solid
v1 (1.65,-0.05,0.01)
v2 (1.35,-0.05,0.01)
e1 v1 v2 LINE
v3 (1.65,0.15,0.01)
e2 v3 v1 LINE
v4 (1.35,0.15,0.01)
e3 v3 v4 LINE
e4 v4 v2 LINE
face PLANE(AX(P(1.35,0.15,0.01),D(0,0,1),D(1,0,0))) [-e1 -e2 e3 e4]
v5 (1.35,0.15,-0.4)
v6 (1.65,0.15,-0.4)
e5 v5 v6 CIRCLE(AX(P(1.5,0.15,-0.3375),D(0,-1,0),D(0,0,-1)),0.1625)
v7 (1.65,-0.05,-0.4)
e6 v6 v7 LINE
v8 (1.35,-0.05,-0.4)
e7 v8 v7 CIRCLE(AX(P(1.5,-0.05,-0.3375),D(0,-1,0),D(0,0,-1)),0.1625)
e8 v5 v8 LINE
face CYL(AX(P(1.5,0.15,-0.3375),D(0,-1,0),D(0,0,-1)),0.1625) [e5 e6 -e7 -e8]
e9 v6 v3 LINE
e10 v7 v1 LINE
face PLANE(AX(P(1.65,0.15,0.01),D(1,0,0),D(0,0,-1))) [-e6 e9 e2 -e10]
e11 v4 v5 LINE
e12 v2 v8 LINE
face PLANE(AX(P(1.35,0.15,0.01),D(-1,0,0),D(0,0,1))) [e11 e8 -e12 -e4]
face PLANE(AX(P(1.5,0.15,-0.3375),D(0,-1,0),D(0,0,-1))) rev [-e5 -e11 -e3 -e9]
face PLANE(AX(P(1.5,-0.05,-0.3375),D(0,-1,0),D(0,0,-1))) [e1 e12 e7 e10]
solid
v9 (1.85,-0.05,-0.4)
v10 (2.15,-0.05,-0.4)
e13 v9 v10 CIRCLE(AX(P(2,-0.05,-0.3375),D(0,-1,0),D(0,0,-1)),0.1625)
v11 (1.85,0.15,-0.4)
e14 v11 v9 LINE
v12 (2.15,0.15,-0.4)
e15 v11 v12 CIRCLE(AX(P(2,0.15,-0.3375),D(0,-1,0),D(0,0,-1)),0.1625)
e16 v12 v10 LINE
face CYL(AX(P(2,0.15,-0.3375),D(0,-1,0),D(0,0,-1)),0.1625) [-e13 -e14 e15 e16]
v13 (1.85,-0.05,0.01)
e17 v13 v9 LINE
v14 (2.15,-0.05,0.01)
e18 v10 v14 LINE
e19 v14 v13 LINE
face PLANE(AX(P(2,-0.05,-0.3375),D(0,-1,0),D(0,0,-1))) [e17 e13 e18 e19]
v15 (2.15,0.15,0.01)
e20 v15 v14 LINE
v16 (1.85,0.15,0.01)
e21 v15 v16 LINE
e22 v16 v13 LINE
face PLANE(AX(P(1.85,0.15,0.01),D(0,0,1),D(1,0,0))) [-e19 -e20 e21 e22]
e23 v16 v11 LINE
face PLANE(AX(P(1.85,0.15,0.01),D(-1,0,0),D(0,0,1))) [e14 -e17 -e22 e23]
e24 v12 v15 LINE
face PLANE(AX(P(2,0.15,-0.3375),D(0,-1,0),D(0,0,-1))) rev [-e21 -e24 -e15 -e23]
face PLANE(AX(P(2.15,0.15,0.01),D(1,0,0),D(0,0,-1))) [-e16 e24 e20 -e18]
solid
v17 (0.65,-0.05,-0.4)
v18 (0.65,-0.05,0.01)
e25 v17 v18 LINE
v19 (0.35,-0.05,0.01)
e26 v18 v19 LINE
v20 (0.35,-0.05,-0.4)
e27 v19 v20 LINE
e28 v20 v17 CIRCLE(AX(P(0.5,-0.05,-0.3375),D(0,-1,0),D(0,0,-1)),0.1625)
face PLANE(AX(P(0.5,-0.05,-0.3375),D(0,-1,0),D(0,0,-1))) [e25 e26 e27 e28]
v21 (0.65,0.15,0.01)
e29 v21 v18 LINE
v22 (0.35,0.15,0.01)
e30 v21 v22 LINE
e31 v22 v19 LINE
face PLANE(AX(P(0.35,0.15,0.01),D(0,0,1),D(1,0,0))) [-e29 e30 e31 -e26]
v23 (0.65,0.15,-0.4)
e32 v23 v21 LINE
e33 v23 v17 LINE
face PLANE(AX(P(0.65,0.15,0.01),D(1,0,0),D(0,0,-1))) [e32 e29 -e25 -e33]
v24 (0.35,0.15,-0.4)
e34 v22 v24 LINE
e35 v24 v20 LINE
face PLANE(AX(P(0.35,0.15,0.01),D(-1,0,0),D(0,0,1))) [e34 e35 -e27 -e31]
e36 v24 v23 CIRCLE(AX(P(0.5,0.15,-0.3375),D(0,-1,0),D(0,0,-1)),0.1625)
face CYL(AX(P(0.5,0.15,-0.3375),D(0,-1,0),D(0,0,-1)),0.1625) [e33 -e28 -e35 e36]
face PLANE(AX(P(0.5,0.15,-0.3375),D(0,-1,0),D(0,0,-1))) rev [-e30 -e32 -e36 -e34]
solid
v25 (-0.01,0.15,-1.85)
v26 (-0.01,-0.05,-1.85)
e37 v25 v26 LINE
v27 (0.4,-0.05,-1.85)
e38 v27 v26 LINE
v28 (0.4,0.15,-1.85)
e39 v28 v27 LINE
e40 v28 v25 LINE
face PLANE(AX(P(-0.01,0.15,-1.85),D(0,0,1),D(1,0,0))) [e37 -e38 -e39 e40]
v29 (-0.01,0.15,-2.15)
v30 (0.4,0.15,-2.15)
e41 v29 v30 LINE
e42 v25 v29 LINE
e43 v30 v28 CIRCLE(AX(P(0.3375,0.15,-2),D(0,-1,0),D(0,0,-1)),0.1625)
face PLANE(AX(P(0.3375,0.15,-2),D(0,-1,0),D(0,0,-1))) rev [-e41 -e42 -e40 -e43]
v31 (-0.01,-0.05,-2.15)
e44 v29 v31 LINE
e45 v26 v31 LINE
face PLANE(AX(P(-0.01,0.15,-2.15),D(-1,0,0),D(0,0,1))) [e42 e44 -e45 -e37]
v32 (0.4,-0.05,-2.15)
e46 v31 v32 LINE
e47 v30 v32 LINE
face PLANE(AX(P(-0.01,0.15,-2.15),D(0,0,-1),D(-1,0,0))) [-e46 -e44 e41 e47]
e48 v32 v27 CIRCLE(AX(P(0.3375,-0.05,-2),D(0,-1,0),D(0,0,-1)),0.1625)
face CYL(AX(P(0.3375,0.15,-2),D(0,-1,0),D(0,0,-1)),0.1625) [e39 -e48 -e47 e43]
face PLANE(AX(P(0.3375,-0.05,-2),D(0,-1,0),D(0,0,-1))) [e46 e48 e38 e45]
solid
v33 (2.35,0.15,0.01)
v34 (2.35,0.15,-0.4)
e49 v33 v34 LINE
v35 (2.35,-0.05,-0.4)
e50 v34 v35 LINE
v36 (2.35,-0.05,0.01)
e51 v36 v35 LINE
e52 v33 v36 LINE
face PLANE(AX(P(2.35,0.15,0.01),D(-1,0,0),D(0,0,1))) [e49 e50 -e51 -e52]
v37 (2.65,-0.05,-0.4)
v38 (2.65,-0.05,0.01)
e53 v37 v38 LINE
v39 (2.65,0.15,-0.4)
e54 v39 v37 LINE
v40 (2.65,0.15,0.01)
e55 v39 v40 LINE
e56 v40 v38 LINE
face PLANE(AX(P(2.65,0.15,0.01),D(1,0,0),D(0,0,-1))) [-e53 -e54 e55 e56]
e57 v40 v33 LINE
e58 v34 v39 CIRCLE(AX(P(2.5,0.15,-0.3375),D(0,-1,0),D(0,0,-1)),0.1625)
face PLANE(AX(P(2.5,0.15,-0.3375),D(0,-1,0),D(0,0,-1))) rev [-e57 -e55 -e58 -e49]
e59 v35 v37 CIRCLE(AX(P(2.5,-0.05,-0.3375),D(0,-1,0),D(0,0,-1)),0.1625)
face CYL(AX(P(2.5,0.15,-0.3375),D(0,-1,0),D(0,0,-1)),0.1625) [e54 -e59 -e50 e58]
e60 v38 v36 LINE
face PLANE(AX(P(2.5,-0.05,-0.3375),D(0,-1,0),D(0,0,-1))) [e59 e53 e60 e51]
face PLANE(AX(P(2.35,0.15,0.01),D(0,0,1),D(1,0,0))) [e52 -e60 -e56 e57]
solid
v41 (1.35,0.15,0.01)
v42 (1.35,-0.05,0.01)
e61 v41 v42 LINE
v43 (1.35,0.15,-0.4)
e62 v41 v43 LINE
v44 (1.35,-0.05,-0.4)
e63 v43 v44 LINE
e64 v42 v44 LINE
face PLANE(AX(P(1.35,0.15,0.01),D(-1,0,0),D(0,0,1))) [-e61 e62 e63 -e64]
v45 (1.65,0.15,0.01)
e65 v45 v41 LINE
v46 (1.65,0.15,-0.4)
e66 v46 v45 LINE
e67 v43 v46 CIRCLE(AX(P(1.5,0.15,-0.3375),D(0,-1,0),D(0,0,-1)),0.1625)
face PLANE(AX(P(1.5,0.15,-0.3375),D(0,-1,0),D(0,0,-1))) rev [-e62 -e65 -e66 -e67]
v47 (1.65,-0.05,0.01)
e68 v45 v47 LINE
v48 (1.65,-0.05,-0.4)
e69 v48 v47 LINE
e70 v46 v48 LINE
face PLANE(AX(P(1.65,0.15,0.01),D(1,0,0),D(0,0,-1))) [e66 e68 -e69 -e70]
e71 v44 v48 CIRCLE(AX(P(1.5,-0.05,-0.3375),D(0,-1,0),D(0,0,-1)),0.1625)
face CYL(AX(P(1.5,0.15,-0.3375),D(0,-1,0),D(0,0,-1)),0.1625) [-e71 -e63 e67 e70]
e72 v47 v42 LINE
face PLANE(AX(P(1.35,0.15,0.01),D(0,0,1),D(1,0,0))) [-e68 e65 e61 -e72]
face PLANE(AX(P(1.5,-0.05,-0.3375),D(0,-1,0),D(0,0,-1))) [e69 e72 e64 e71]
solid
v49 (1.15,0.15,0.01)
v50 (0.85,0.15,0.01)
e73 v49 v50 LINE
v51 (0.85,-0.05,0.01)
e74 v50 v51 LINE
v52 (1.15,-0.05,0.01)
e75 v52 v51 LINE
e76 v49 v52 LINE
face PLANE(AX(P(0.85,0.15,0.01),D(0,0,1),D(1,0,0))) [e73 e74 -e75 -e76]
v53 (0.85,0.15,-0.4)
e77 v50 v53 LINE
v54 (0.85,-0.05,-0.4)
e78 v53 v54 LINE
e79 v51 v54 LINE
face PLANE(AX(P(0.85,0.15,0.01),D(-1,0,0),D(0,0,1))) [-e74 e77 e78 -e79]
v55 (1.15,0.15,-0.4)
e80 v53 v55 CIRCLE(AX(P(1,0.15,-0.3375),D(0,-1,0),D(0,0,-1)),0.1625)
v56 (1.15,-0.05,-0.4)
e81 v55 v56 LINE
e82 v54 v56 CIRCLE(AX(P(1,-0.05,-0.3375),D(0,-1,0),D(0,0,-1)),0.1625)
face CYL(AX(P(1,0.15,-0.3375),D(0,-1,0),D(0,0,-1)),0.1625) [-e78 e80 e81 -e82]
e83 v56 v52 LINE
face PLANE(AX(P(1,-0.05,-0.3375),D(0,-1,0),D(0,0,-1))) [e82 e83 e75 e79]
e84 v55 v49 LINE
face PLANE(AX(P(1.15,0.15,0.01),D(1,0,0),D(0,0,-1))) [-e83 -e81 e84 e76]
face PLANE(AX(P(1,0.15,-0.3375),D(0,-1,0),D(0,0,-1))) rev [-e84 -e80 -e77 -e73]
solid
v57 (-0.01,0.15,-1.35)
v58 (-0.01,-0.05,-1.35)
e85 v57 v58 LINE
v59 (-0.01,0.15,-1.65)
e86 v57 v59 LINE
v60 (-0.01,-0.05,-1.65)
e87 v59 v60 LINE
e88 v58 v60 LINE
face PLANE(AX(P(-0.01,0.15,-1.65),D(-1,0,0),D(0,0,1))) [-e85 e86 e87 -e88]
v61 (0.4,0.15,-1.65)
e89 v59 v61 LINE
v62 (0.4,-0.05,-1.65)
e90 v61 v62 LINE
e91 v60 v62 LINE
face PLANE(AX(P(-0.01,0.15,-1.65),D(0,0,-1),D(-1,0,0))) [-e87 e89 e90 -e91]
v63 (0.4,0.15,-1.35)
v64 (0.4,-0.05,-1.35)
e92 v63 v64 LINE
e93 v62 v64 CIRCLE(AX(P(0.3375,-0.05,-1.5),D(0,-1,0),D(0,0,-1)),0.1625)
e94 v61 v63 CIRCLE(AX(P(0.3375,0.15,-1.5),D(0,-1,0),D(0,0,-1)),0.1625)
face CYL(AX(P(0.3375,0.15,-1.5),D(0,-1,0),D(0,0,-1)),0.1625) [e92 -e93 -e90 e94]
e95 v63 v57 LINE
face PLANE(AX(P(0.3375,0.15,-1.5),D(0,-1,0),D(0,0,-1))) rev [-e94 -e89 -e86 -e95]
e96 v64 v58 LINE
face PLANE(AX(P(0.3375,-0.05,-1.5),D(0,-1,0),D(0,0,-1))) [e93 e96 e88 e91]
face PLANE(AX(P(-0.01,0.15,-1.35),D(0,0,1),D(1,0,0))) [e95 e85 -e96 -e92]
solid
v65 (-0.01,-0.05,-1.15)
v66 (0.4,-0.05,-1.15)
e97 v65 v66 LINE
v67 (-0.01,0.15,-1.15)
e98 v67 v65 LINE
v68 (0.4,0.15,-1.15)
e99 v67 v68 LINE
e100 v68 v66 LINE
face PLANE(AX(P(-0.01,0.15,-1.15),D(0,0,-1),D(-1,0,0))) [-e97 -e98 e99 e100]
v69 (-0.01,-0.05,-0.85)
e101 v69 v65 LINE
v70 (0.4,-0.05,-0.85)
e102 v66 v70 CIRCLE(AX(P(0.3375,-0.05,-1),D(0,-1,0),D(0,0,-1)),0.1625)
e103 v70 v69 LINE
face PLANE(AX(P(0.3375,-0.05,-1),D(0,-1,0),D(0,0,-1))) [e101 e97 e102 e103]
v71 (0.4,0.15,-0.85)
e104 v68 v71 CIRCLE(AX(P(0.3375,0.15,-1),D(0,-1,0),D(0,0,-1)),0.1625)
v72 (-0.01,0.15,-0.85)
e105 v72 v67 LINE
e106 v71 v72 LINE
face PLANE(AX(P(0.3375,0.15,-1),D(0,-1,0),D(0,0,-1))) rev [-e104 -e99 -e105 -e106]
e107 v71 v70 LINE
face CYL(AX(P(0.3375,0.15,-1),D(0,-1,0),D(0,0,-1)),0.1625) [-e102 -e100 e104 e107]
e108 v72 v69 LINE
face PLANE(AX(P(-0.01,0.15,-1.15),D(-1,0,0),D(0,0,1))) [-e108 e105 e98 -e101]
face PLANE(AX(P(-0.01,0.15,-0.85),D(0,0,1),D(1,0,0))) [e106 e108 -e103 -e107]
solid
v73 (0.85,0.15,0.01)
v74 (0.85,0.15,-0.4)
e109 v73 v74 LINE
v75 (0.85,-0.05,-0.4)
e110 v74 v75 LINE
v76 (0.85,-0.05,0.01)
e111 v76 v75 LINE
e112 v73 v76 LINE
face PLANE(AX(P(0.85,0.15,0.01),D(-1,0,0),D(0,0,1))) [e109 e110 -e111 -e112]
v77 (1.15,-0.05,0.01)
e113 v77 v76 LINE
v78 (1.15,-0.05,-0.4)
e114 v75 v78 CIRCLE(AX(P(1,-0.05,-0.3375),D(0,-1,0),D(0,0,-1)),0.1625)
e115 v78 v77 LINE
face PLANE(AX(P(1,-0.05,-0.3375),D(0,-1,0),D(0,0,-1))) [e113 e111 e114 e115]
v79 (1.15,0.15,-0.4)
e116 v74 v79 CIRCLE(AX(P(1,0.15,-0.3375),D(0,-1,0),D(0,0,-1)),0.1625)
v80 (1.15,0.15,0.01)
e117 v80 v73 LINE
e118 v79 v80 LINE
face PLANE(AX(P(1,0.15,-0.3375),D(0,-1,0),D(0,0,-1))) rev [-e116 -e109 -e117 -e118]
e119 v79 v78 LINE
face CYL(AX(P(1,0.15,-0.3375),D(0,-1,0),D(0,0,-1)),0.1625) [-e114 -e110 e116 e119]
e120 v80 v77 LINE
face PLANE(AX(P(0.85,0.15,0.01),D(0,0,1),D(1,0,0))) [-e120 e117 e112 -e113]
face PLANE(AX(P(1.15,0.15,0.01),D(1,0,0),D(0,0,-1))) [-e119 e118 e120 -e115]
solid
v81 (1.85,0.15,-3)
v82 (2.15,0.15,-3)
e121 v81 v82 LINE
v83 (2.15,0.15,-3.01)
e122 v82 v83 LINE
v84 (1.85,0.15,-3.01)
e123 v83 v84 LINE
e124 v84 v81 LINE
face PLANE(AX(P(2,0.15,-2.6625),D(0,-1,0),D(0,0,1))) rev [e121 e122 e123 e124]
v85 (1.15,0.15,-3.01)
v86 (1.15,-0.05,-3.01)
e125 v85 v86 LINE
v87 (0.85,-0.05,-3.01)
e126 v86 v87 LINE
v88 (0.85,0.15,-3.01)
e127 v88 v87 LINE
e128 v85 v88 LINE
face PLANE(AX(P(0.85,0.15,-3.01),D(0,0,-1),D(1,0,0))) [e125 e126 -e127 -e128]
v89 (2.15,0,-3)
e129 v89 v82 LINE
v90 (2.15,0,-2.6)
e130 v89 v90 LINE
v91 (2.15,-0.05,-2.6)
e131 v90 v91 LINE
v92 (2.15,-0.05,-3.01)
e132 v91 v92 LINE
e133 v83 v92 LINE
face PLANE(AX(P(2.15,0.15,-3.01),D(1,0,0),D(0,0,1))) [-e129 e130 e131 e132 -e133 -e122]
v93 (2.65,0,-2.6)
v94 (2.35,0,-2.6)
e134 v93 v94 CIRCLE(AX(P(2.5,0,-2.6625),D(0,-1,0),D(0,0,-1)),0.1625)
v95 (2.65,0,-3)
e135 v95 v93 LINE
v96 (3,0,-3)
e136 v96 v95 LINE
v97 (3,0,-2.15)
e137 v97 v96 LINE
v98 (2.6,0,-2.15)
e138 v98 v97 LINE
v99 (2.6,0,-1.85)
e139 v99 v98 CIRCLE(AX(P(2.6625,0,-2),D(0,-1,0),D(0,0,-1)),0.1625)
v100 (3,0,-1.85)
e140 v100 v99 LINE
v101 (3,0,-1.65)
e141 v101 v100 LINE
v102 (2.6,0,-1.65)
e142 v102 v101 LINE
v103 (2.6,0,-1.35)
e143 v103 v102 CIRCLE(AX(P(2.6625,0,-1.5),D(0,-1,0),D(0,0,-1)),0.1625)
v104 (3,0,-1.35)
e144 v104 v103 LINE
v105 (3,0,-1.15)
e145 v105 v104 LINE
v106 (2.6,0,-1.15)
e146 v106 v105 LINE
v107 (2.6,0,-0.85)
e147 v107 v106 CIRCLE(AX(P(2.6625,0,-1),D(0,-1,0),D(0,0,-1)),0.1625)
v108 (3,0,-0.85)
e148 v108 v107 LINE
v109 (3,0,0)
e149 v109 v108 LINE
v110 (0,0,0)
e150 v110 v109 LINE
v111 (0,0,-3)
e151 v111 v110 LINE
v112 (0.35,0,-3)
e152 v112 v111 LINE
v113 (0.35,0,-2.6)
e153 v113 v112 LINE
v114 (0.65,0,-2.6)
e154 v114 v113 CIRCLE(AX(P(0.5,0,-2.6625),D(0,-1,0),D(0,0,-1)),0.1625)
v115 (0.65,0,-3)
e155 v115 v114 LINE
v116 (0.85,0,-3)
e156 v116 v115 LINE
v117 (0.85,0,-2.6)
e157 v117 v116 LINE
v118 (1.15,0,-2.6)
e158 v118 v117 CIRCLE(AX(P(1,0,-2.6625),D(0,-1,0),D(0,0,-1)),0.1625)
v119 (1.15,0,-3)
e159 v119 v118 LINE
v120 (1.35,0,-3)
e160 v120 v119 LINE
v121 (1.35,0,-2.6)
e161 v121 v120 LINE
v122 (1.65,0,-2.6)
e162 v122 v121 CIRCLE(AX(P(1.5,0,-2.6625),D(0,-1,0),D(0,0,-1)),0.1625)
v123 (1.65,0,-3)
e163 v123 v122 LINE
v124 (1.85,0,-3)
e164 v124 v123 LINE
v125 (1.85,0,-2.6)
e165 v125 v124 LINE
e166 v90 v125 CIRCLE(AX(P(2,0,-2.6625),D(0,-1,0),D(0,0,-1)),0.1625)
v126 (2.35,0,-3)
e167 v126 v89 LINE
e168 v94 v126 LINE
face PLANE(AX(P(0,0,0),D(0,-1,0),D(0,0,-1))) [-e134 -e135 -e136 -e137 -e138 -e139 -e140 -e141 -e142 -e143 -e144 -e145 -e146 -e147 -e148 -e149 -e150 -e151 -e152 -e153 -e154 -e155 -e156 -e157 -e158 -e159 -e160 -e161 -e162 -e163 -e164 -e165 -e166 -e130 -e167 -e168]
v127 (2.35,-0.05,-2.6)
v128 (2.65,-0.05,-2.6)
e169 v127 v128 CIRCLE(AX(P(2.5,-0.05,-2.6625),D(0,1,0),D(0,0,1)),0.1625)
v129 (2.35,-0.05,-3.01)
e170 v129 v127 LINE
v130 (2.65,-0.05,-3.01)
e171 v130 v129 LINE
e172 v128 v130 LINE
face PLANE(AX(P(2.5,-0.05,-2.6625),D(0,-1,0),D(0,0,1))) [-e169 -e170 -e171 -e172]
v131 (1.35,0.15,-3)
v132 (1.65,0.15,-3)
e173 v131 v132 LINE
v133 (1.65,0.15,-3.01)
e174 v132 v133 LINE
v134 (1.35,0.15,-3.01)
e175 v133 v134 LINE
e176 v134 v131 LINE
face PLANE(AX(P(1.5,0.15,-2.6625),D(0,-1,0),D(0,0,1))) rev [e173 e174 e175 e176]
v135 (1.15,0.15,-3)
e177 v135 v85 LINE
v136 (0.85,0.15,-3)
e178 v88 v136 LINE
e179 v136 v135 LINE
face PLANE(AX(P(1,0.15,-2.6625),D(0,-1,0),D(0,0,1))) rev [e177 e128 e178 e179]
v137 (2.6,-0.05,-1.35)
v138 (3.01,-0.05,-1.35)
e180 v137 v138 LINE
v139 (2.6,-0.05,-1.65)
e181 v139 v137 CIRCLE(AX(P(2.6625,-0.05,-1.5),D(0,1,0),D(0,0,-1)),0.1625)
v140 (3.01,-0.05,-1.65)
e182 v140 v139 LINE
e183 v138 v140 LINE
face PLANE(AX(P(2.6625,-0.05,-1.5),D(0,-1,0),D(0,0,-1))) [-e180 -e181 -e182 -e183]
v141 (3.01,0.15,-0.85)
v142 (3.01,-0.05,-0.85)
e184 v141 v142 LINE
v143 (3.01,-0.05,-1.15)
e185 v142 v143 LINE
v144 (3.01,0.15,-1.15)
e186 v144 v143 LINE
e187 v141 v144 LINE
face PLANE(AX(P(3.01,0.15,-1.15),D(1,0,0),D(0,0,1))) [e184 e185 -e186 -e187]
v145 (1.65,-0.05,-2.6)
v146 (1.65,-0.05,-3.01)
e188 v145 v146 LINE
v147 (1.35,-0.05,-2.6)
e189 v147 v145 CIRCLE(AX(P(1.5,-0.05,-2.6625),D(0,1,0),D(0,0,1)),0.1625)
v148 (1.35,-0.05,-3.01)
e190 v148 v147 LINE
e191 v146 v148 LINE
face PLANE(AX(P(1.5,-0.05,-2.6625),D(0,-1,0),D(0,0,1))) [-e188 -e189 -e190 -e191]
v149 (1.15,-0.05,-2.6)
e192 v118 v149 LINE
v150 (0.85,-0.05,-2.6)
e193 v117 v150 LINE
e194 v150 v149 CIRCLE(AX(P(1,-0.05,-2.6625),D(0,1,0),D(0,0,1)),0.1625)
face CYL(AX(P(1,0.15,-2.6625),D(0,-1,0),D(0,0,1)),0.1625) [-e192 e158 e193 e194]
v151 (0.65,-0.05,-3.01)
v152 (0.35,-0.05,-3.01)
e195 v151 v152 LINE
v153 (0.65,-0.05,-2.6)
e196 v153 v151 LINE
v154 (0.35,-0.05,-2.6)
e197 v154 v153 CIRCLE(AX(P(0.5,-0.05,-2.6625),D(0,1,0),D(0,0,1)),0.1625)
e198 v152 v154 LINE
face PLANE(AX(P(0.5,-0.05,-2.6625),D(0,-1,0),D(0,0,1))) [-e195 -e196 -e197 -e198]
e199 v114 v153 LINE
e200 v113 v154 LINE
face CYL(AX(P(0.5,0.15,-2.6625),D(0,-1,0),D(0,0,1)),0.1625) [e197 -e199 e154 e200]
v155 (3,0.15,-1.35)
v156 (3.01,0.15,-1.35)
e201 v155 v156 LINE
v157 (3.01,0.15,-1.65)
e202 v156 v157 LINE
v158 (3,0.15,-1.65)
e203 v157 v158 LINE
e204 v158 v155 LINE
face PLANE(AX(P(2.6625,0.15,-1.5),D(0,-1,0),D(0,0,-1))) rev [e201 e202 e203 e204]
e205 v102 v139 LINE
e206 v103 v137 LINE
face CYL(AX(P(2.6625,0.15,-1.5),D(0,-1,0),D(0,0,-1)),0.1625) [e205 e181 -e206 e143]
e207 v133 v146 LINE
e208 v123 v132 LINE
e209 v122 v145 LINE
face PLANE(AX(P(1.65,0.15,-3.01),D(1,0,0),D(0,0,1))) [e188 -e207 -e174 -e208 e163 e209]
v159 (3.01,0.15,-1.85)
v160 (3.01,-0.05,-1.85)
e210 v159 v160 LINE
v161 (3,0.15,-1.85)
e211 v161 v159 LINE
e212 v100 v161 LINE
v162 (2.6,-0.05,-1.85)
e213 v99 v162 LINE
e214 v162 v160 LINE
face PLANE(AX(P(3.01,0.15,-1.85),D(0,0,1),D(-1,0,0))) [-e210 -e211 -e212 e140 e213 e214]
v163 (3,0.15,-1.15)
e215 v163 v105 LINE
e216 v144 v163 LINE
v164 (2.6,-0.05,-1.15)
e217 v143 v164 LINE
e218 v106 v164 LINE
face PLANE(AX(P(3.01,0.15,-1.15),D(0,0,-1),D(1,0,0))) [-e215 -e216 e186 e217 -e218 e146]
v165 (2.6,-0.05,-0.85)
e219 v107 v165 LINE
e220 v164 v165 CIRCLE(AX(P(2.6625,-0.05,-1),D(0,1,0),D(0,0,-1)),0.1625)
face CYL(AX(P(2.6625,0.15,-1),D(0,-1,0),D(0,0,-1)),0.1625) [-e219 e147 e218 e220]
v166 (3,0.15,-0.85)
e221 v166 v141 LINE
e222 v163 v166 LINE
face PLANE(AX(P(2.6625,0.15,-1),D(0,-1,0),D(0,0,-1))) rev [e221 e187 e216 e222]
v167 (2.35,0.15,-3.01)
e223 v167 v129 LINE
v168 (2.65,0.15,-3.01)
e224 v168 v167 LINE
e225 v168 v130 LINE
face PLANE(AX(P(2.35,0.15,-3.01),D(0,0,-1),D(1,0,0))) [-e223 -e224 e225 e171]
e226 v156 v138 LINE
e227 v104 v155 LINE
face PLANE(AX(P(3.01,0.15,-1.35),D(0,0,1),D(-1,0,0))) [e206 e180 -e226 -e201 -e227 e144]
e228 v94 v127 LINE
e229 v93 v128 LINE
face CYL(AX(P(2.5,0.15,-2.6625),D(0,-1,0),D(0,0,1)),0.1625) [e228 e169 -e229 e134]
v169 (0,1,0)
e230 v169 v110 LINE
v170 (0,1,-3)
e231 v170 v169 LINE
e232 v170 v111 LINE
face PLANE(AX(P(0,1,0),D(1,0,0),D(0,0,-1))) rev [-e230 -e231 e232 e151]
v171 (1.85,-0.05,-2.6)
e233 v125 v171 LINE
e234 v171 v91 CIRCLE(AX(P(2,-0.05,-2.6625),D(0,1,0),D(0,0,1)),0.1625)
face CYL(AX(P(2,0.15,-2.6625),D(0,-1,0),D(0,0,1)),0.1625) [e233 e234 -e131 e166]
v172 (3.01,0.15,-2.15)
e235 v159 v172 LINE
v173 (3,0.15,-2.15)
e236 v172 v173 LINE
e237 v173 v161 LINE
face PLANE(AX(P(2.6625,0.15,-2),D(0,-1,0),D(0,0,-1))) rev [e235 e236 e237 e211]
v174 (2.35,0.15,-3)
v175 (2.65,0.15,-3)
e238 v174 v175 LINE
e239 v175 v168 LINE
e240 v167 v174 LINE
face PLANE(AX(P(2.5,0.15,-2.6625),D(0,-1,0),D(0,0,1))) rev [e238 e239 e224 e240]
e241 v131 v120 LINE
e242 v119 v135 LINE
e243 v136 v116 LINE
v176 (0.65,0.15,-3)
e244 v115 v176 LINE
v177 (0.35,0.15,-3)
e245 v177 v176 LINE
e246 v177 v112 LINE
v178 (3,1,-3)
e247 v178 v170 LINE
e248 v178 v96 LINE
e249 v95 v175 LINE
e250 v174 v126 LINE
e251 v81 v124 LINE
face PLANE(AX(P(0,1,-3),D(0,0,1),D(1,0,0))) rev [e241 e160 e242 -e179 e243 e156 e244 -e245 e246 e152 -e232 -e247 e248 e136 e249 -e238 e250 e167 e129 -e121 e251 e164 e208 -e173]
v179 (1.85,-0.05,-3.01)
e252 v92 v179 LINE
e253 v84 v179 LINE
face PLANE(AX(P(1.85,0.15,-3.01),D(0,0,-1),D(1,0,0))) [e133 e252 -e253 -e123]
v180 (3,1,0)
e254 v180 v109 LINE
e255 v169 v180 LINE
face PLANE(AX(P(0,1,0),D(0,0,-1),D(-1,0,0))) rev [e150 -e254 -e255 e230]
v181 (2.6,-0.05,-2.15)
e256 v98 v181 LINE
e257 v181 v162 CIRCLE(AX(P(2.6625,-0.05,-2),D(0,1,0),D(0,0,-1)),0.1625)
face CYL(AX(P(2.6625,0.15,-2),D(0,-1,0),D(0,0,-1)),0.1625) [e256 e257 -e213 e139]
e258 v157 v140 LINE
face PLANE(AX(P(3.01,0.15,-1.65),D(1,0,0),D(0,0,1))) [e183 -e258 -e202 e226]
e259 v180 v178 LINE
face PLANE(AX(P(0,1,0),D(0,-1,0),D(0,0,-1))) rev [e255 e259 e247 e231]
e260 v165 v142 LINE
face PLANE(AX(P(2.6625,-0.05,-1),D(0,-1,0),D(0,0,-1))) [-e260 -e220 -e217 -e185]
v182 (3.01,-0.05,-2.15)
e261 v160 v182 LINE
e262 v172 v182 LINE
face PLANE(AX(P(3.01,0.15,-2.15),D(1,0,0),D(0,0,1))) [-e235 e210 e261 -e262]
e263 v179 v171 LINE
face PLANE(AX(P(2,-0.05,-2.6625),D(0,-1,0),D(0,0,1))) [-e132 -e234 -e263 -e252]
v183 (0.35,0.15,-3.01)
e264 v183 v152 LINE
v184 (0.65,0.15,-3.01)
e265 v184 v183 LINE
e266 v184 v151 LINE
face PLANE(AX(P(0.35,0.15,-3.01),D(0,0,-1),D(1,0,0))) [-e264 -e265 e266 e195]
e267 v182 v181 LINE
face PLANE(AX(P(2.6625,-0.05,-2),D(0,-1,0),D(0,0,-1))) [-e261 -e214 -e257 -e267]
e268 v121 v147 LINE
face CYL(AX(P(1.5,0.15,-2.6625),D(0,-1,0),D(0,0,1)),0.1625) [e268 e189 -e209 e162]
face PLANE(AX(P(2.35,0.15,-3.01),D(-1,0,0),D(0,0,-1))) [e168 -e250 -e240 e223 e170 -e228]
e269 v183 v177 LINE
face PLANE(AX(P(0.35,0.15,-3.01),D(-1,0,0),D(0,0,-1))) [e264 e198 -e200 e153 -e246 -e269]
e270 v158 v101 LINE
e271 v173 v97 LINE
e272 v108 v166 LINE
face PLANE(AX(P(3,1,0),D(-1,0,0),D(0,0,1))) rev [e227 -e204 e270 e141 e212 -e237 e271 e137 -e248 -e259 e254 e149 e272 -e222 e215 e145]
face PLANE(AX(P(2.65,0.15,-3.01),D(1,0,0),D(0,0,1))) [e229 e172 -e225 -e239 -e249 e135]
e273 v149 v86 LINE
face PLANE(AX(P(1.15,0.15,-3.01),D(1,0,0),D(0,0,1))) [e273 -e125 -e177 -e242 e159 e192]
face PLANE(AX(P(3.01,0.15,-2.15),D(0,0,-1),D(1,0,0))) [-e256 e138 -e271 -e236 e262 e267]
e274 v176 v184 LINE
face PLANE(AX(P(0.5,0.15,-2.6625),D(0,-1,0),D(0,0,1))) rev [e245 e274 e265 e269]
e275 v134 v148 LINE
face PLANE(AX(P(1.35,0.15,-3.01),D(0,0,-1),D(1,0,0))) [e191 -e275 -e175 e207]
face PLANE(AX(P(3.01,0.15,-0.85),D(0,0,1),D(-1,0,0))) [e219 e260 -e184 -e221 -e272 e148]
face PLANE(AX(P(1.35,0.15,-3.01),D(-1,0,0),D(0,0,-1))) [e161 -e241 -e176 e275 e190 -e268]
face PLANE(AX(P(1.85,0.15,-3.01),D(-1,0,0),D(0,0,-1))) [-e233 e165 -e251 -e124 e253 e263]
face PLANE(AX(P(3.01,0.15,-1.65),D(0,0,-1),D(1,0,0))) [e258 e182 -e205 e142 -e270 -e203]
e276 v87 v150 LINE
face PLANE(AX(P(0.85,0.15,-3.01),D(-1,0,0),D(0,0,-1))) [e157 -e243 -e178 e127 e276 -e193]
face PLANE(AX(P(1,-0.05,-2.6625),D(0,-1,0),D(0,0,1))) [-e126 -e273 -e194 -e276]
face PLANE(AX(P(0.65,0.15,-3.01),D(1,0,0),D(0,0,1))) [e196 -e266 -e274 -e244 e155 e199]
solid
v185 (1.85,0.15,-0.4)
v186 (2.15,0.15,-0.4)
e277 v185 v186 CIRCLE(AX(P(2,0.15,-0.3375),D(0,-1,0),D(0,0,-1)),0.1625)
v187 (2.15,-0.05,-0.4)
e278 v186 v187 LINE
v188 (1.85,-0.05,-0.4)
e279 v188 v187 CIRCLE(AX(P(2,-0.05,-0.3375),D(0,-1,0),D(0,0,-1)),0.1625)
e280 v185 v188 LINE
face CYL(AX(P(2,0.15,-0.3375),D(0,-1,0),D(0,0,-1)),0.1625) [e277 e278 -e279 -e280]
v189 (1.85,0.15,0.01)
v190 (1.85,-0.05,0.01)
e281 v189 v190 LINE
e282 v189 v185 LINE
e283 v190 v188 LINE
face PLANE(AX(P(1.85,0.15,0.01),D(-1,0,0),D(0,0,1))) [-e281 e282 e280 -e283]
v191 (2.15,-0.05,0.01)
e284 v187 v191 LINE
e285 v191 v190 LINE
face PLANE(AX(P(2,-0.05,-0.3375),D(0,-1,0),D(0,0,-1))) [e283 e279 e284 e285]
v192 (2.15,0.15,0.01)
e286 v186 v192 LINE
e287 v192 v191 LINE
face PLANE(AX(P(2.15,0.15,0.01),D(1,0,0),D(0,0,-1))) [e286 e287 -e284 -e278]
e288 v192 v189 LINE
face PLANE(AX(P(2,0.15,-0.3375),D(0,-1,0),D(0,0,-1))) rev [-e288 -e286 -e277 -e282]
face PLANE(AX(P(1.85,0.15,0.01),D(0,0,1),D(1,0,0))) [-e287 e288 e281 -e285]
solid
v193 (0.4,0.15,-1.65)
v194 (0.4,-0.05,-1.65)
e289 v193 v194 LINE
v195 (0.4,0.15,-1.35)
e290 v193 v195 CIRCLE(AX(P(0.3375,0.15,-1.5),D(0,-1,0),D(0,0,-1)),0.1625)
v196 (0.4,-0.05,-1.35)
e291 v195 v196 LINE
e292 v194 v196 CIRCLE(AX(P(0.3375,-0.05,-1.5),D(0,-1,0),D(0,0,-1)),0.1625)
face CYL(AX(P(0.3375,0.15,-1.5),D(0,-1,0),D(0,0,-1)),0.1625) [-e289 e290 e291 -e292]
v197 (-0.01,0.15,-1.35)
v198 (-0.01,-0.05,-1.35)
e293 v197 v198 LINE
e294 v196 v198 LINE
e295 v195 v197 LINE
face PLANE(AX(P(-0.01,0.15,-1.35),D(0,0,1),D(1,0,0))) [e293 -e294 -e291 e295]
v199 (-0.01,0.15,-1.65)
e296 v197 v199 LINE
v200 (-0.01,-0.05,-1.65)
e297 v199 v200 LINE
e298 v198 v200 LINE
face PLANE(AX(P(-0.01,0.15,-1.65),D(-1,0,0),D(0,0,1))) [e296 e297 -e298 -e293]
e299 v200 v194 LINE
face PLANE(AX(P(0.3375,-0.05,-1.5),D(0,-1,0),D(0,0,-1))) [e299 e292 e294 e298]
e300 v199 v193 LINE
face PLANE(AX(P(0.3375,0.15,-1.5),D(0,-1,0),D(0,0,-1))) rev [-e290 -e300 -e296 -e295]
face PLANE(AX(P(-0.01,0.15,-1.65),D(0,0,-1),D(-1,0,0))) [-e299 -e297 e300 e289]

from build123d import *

# Parameters (mm, degrees)
SKETCH1_W           = 3
SKETCH1_H           = 3
BOSS_EXTRUDE1_DEPTH = 1
BOSS_EXTRUDE2_START = 0.05
BOSS_EXTRUDE2_DEPTH = 0.2
LPATTERN1_START     = -0.05
LPATTERN1_DEPTH     = 0.2
LPATTERN1_2_DEPTH   = 0.2
LPATTERN1_3_DEPTH   = 0.2
LPATTERN1_4_DEPTH   = 0.2
LPATTERN1_5_DEPTH   = 0.2
LPATTERN1_6_DEPTH   = 0.2
LPATTERN1_7_DEPTH   = 0.2
BOSS_EXTRUDE4_START = 0.05
BOSS_EXTRUDE4_DEPTH = 0.2
LPATTERN3_START     = -0.05
LPATTERN3_DEPTH     = 0.2
LPATTERN3_2_DEPTH   = 0.2
LPATTERN3_3_DEPTH   = 0.2


# Read off the part's stored shape, not the designer's step: LPattern1, LPattern3
with BuildPart() as part:
    # Sketch1 → Boss-Extrude1 (new body)
    with BuildSketch(Plane(origin=(0, 0, 0), x_dir=(1, 0, 0), z_dir=(0, 1, 0))):
        with Locations((1.5, 1.5)):
            Rectangle(SKETCH1_W, SKETCH1_H)
    extrude(amount=BOSS_EXTRUDE1_DEPTH)


with BuildPart() as body_2:
    # Sketch2 → Boss-Extrude2 (new body)
    with BuildSketch(Plane.XZ.offset(BOSS_EXTRUDE2_START)):
        with BuildLine():
            Line((2.15, 0.01), (2.15, -0.4))
            ThreePointArc((2.15, -0.4), (2, -0.5), (1.85, -0.4))
            Line((1.85, -0.4), (1.85, 0.01))
            Line((1.85, 0.01), (2.15, 0.01))
        make_face()
    boss_extrude2 = extrude(amount=-BOSS_EXTRUDE2_DEPTH)


with BuildPart() as body_3:
    # LPattern1 outline → LPattern1 (new body)
    with BuildSketch(Plane(origin=(0, 0, 0), x_dir=(1, 0, 0), z_dir=(0, 1, 0)).offset(LPATTERN1_START)):
        with BuildLine():
            ThreePointArc((1.15, 0.4), (1, 0.5), (0.85, 0.4))
            Line((0.85, 0.4), (0.85, -0.01))
            Line((0.85, -0.01), (1.15, -0.01))
            Line((1.15, -0.01), (1.15, 0.4))
        make_face()
    lpattern1 = extrude(amount=LPATTERN1_DEPTH)


with BuildPart() as body_4:
    # LPattern1 2 outline → LPattern1 2 (new body)
    with BuildSketch(Plane(origin=(0, 0, 0), x_dir=(1, 0, 0), z_dir=(0, 1, 0)).offset(LPATTERN1_START)):
        with BuildLine():
            ThreePointArc((1.65, 0.4), (1.5, 0.5), (1.35, 0.4))
            Line((1.35, 0.4), (1.35, -0.01))
            Line((1.35, -0.01), (1.65, -0.01))
            Line((1.65, -0.01), (1.65, 0.4))
        make_face()
    lpattern1_2 = extrude(amount=LPATTERN1_2_DEPTH)


with BuildPart() as body_5:
    # LPattern1 3 outline → LPattern1 3 (new body)
    with BuildSketch(Plane(origin=(0, 0, 0), x_dir=(1, 0, 0), z_dir=(0, 1, 0)).offset(LPATTERN1_START)):
        with BuildLine():
            ThreePointArc((2.65, 0.4), (2.5, 0.5), (2.35, 0.4))
            Line((2.35, 0.4), (2.35, -0.01))
            Line((2.35, -0.01), (2.65, -0.01))
            Line((2.65, -0.01), (2.65, 0.4))
        make_face()
    lpattern1_3 = extrude(amount=LPATTERN1_3_DEPTH)


with BuildPart() as body_6:
    # LPattern1 4 outline → LPattern1 4 (new body)
    with BuildSketch(Plane(origin=(0, 0, 0), x_dir=(1, 0, 0), z_dir=(0, 1, 0)).offset(LPATTERN1_START)):
        with BuildLine():
            ThreePointArc((0.65, 0.4), (0.5, 0.5), (0.35, 0.4))
            Line((0.35, 0.4), (0.35, -0.01))
            Line((0.35, -0.01), (0.65, -0.01))
            Line((0.65, -0.01), (0.65, 0.4))
        make_face()
    lpattern1_4 = extrude(amount=LPATTERN1_4_DEPTH)


with BuildPart() as body_7:
    # LPattern1 5 outline → LPattern1 5 (new body)
    with BuildSketch(Plane(origin=(0, 0, 0), x_dir=(1, 0, 0), z_dir=(0, 1, 0)).offset(LPATTERN1_START)):
        with BuildLine():
            ThreePointArc((1.15, 0.4), (1, 0.5), (0.85, 0.4))
            Line((0.85, 0.4), (0.85, -0.01))
            Line((0.85, -0.01), (1.15, -0.01))
            Line((1.15, -0.01), (1.15, 0.4))
        make_face()
    lpattern1_5 = extrude(amount=LPATTERN1_5_DEPTH)


with BuildPart() as body_8:
    # LPattern1 6 outline → LPattern1 6 (new body)
    with BuildSketch(Plane(origin=(0, 0, 0), x_dir=(1, 0, 0), z_dir=(0, 1, 0)).offset(LPATTERN1_START)):
        with BuildLine():
            ThreePointArc((1.65, 0.4), (1.5, 0.5), (1.35, 0.4))
            Line((1.35, 0.4), (1.35, -0.01))
            Line((1.35, -0.01), (1.65, -0.01))
            Line((1.65, -0.01), (1.65, 0.4))
        make_face()
    lpattern1_6 = extrude(amount=LPATTERN1_6_DEPTH)


with BuildPart() as body_9:
    # LPattern1 7 outline → LPattern1 7 (new body)
    with BuildSketch(Plane(origin=(0, 0, 0), x_dir=(1, 0, 0), z_dir=(0, 1, 0)).offset(LPATTERN1_START)):
        with BuildLine():
            ThreePointArc((2.15, 0.4), (2, 0.5), (1.85, 0.4))
            Line((1.85, 0.4), (1.85, -0.01))
            Line((1.85, -0.01), (2.15, -0.01))
            Line((2.15, -0.01), (2.15, 0.4))
        make_face()
    lpattern1_7 = extrude(amount=LPATTERN1_7_DEPTH)


with BuildPart() as body_10:
    # Sketch5 → Boss-Extrude4 (new body)
    with BuildSketch(Plane.XZ.offset(BOSS_EXTRUDE4_START)):
        with BuildLine():
            Line((-0.01, -0.85), (0.4, -0.85))
            ThreePointArc((0.4, -0.85), (0.5, -1), (0.4, -1.15))
            Line((0.4, -1.15), (-0.01, -1.15))
            Line((-0.01, -1.15), (-0.01, -0.85))
        make_face()
    boss_extrude4 = extrude(amount=-BOSS_EXTRUDE4_DEPTH)


with BuildPart() as body_11:
    # LPattern3 outline → LPattern3 (new body)
    with BuildSketch(Plane(origin=(0, 0, 0), x_dir=(1, 0, 0), z_dir=(0, 1, 0)).offset(LPATTERN3_START)):
        with BuildLine():
            ThreePointArc((0.4, 1.85), (0.5, 2), (0.4, 2.15))
            Line((0.4, 2.15), (-0.01, 2.15))
            Line((-0.01, 2.15), (-0.01, 1.85))
            Line((-0.01, 1.85), (0.4, 1.85))
        make_face()
    lpattern3 = extrude(amount=LPATTERN3_DEPTH)


with BuildPart() as body_12:
    # LPattern3 2 outline → LPattern3 2 (new body)
    with BuildSketch(Plane(origin=(0, 0, 0), x_dir=(1, 0, 0), z_dir=(0, 1, 0)).offset(LPATTERN3_START)):
        with BuildLine():
            ThreePointArc((0.4, 1.35), (0.5, 1.5), (0.4, 1.65))
            Line((0.4, 1.65), (-0.01, 1.65))
            Line((-0.01, 1.65), (-0.01, 1.35))
            Line((-0.01, 1.35), (0.4, 1.35))
        make_face()
    lpattern3_2 = extrude(amount=LPATTERN3_2_DEPTH)


with BuildPart() as body_13:
    # LPattern3 3 outline → LPattern3 3 (new body)
    with BuildSketch(Plane(origin=(0, 0, 0), x_dir=(1, 0, 0), z_dir=(0, 1, 0)).offset(LPATTERN3_START)):
        with BuildLine():
            ThreePointArc((0.4, 1.35), (0.5, 1.5), (0.4, 1.65))
            Line((0.4, 1.65), (-0.01, 1.65))
            Line((-0.01, 1.65), (-0.01, 1.35))
            Line((-0.01, 1.35), (0.4, 1.35))
        make_face()
    lpattern3_3 = extrude(amount=LPATTERN3_3_DEPTH)


with BuildPart() as part_1:
    add(part.part)

    # Mirror7: Boss-Extrude4, LPattern3, LPattern3 2, LPattern3 3 across plane
    add(boss_extrude4.mirror(Plane(origin=(1.5, 0, 0), x_dir=(0, 0, 1), z_dir=(1, 0, 0))))
    add(lpattern3.mirror(Plane(origin=(1.5, 0, 0), x_dir=(0, 0, 1), z_dir=(1, 0, 0))))
    add(lpattern3_2.mirror(Plane(origin=(1.5, 0, 0), x_dir=(0, 0, 1), z_dir=(1, 0, 0))))
    add(lpattern3_3.mirror(Plane(origin=(1.5, 0, 0), x_dir=(0, 0, 1), z_dir=(1, 0, 0))))

    # Mirror8: Boss-Extrude2, LPattern1, LPattern1 2, LPattern1 3, LPattern1 4, LPattern1 5, LPattern1 6, LPattern1 7 across plane
    add(boss_extrude2.mirror(Plane.XY.offset(-1.5)))
    add(lpattern1.mirror(Plane.XY.offset(-1.5)))
    add(lpattern1_2.mirror(Plane.XY.offset(-1.5)))
    add(lpattern1_3.mirror(Plane.XY.offset(-1.5)))
    add(lpattern1_4.mirror(Plane.XY.offset(-1.5)))
    add(lpattern1_5.mirror(Plane.XY.offset(-1.5)))
    add(lpattern1_6.mirror(Plane.XY.offset(-1.5)))
    add(lpattern1_7.mirror(Plane.XY.offset(-1.5)))


solid = Compound([body_2.part, body_3.part, body_4.part, body_5.part, body_6.part, body_7.part, body_8.part, body_9.part, body_10.part, body_11.part, body_12.part, body_13.part, part_1.part])
